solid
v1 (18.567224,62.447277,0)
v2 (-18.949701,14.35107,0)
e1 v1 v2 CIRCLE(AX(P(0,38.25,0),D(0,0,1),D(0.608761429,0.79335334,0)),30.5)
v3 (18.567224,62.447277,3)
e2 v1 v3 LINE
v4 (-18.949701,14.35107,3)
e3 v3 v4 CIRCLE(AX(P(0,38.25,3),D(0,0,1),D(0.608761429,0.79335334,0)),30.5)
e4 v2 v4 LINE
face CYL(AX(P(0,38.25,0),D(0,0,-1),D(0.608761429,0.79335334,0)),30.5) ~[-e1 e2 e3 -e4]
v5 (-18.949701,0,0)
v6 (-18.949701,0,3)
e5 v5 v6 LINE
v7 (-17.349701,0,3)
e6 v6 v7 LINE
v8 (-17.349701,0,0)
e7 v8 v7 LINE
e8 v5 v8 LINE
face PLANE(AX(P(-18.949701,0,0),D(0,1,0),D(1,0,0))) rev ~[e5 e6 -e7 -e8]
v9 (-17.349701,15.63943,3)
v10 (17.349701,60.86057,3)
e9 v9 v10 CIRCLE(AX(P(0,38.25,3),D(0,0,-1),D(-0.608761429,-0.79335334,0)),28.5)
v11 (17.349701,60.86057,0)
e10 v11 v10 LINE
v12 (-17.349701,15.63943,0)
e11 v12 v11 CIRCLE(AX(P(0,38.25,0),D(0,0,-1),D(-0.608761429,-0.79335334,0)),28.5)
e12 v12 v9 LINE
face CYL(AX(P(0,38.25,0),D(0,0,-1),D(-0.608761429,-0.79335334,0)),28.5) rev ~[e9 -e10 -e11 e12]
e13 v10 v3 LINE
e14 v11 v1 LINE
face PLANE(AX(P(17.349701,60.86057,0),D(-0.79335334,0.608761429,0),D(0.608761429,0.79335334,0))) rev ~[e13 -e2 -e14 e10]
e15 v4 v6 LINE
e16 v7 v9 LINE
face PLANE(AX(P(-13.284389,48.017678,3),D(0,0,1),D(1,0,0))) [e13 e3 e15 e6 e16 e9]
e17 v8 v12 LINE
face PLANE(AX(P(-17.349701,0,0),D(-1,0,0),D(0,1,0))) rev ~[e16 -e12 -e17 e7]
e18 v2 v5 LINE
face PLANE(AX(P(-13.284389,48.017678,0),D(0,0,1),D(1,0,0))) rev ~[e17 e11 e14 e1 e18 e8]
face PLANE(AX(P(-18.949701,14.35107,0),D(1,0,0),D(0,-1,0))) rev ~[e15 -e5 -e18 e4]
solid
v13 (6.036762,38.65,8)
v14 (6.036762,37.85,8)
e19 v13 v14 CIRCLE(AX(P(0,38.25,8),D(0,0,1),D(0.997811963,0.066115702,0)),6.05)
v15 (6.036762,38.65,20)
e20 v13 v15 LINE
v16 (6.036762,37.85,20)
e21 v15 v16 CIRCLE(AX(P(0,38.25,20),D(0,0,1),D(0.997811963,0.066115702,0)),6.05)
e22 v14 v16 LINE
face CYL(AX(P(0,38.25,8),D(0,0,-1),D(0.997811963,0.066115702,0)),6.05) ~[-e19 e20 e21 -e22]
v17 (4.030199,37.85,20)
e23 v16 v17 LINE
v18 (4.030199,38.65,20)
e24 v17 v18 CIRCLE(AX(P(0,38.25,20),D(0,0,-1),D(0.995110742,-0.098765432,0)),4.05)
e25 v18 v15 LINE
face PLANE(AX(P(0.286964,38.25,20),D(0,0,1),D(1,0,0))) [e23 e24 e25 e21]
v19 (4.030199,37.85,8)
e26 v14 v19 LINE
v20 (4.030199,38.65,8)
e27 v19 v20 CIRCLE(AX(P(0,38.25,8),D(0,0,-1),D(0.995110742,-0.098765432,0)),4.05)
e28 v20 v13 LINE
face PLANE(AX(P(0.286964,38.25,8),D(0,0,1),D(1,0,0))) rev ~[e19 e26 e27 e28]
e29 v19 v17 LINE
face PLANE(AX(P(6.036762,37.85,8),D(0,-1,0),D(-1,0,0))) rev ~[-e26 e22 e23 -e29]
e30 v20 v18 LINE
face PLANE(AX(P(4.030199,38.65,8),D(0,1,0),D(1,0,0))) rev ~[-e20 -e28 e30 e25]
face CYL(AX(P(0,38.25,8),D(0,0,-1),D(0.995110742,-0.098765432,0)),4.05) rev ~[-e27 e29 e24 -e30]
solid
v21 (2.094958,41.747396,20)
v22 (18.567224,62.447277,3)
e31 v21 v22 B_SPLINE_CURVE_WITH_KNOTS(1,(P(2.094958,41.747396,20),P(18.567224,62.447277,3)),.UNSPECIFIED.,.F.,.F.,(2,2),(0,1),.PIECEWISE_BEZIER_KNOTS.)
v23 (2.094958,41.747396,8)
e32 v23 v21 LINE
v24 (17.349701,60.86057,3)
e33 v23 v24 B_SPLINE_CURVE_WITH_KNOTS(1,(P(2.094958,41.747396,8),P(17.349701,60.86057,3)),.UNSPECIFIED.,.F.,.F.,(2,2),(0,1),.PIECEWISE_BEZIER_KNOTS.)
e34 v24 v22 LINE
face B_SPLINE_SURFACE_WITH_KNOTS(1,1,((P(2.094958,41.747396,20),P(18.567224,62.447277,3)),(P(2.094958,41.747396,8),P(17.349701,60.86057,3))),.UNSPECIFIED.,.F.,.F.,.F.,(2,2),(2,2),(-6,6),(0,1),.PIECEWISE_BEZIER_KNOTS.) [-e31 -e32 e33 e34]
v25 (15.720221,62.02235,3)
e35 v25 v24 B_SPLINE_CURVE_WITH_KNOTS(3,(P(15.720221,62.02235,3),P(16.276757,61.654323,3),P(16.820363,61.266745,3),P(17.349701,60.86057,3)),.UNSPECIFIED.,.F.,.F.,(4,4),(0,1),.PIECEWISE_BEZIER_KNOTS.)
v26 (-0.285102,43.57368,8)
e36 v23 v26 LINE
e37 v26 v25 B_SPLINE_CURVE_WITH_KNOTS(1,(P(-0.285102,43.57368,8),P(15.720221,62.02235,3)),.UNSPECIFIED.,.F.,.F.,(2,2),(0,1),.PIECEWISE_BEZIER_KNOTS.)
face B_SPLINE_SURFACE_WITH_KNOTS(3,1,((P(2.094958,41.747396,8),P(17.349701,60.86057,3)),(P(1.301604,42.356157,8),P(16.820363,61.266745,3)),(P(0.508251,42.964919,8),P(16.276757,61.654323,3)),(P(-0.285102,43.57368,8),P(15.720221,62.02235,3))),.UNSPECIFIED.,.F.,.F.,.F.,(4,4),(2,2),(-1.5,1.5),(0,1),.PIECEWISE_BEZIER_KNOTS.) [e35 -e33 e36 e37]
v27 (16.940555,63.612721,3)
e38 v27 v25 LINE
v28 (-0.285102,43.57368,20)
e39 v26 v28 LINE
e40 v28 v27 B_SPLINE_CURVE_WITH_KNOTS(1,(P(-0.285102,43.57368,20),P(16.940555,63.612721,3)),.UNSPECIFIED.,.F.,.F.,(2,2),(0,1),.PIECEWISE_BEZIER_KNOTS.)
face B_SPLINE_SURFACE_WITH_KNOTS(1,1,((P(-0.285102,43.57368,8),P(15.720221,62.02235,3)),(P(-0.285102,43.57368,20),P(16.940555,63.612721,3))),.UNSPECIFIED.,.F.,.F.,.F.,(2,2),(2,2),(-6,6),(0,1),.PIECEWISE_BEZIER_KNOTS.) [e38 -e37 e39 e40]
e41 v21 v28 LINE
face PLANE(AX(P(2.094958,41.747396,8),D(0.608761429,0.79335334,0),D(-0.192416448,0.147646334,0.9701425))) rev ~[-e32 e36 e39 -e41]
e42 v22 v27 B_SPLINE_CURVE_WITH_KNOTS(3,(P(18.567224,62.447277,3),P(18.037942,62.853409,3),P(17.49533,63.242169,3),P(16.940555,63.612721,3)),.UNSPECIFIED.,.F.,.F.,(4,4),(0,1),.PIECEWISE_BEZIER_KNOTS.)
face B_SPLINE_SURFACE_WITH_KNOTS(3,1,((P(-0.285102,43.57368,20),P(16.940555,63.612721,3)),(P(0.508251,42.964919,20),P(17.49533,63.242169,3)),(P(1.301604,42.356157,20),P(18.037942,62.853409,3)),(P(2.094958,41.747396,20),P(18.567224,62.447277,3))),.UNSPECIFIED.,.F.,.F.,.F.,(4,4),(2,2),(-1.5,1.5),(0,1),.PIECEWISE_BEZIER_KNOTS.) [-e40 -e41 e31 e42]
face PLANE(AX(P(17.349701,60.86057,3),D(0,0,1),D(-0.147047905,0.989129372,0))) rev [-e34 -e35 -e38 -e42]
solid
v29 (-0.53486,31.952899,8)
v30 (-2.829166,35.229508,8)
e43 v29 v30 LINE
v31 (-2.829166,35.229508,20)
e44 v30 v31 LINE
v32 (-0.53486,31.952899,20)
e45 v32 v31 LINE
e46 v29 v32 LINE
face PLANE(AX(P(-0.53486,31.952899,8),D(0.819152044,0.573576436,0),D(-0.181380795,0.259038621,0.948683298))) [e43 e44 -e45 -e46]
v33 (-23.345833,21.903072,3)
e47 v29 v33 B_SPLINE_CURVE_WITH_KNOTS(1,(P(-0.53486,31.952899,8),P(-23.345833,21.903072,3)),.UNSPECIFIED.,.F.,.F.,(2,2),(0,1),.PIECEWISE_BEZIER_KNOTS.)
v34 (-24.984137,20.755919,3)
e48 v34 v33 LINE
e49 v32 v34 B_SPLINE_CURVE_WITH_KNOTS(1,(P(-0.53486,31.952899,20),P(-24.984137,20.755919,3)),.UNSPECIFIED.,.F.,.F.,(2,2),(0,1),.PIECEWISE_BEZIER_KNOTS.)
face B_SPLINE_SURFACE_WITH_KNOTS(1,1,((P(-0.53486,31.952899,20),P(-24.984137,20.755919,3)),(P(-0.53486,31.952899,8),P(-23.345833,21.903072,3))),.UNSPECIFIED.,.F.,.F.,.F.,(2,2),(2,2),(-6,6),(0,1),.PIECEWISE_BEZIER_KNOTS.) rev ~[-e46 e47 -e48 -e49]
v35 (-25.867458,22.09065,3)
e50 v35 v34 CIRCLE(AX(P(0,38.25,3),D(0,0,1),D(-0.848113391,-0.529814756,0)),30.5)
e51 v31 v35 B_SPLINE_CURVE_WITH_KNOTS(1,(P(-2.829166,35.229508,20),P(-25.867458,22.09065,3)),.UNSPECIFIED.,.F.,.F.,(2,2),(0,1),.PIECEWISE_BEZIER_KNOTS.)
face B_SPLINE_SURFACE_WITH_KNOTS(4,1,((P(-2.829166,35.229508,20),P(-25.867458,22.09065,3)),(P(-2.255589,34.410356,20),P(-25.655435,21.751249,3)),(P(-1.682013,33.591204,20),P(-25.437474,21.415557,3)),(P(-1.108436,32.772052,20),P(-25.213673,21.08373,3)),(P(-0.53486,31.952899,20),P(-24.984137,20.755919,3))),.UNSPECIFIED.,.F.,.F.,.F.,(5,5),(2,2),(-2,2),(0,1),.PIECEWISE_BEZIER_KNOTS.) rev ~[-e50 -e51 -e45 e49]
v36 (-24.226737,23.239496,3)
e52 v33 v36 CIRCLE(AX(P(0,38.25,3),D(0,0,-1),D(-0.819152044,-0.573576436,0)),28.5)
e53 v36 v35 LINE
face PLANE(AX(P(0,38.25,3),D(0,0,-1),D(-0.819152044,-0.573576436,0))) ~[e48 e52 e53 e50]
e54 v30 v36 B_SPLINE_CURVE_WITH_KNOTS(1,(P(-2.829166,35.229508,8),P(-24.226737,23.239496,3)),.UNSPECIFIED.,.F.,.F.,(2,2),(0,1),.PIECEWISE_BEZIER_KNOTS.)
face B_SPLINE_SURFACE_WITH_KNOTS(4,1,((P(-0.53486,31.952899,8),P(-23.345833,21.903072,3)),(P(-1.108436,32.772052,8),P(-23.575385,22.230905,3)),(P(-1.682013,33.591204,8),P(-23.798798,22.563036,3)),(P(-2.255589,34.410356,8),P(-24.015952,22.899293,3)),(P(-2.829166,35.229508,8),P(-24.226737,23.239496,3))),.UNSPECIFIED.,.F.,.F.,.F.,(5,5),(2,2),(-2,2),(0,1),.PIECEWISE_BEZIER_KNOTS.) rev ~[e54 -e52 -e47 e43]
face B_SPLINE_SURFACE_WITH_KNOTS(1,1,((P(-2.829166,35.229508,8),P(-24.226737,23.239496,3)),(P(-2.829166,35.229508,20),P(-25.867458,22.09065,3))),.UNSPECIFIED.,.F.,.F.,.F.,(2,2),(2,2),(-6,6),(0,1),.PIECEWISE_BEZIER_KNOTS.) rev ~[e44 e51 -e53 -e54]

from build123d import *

# Parameters (mm, degrees)
F1_DEPTH = 3
F4_DEPTH = 12
F7_W     = 4
F7_H     = 12
F10_W    = 3
F10_H    = 12


# Not quite as in the source:
# - a feature of the source that left no trace in its solid (it failed there, or was rolled back) is left out
# - the arcs of a loft's sections are written as splines that run evenly, so that the points pair up as in the source's solid


with BuildPart() as f1:
    # F0 (on Top) → F1 (new body)
    with BuildSketch(Plane.XY):
        with BuildLine():
            ThreePointArc((-17.3497007267, 15.6394298017), (-22.6105701983, 55.5997007267), (17.3497007267, 60.8605701983))
            Line((17.3497007267, 60.8605701983), (18.5672235848, 62.4472768789))
            ThreePointArc((18.5672235848, 62.4472768789), (-24.0488636903, 57.0090552855), (-18.9497007267, 14.3510702673))
            ThreePointArc((-18.9497007267, 14.3510702673), (-18.1593804565, 13.7451657537), (-17.3497007267, 13.1653854984))
            Line((-17.3497007267, 13.1653854984), (-17.3497007267, 15.6394298017))
        make_face()
        with BuildLine():
            Line((-17.3497007267, 0), (-17.3497007267, 13.1653854984))
            ThreePointArc((-17.3497007267, 13.1653854984), (-18.1593804565, 13.7451657537), (-18.9497007267, 14.3510702673))
            Line((-18.9497007267, 14.3510702673), (-18.9497007267, 0))
            Line((-18.9497007267, 0), (-17.3497007267, 0))
        make_face()
    extrude(amount=F1_DEPTH)


with BuildPart() as f4:
    # F3 (on offset) → F4 (new body)
    with BuildSketch(Plane.XY.offset(8)):
        with BuildLine():
            ThreePointArc((4.0301985063, 37.85), (-4.05, 38.25), (4.0301985063, 38.65))
            Line((4.0301985063, 38.65), (6.0367623773, 38.65))
            ThreePointArc((6.0367623773, 38.65), (-6.05, 38.25), (6.0367623773, 37.85))
            Line((6.0367623773, 37.85), (4.0301985063, 37.85))
        make_face()
    extrude(amount=F4_DEPTH)


with BuildPart() as f8:
    # F7 (on face) → F8 section 0
    with BuildSketch(Plane(origin=(14.6540555932, 10.2608801917, 0), x_dir=(-0.5735764364, 0.8191520443, 0), z_dir=(0.8191520443, 0.5735764364, 0))):
        with Locations((28.4810658991, 14)):
            Rectangle(F7_W, F7_H)
    # F5 (on face) → F8 section 1
    with BuildSketch(Plane.XY.offset(3)):
        with BuildLine():
            Line((-24.22673654, 23.2394957905), (-25.8674584367, 22.0906499503))
            ThreePointArc((-25.8674584367, 22.0906499503), (-25.4345547517, 21.4174890589), (-24.9841373508, 20.7559186913))
            Line((-24.9841373508, 20.7559186913), (-23.3458332622, 21.903071564))
            ThreePointArc((-23.3458332622, 21.903071564), (-23.7956688669, 22.5650982415), (-24.22673654, 23.2394957905))
        make_face()
    loft()


with BuildPart() as f11:
    # F10 (on face) → F11 section 0
    with BuildSketch(Plane(origin=(20.9388152153, 27.2879952658, 0), x_dir=(-0.7933533403, 0.608761429, 0), z_dir=(0.608761429, 0.7933533403, 0))):
        with Locations((25.2521627247, 14)):
            Rectangle(F10_W, F10_H)
    # F5 (on face) → F11 section 1
    with BuildSketch(Plane.XY.offset(3)):
        with BuildLine():
            add(Edge.make_bspline(
                [(18.5672235848, 62.4472768789), (18.0379415831, 62.853409243), (17.4953295888, 63.2421692839), (16.9405551176, 63.6127205226)],
                knots=[0, 0, 0, 0, 1, 1, 1, 1], degree=3))
            Line((16.9405551176, 63.6127205226), (15.7202212212, 62.0223504256))
            add(Edge.make_bspline(
                [(15.7202212212, 62.0223504256), (16.276757018, 61.6543234662), (16.8203634304, 61.2667449915), (17.3497007267, 60.8605701983)],
                knots=[0, 0, 0, 0, 1, 1, 1, 1], degree=3))
            Line((17.3497007267, 60.8605701983), (18.5672235848, 62.4472768789))
        make_face()
    loft(ruled=True)


solid = Compound([f1.part, f4.part, f8.part, f11.part])
